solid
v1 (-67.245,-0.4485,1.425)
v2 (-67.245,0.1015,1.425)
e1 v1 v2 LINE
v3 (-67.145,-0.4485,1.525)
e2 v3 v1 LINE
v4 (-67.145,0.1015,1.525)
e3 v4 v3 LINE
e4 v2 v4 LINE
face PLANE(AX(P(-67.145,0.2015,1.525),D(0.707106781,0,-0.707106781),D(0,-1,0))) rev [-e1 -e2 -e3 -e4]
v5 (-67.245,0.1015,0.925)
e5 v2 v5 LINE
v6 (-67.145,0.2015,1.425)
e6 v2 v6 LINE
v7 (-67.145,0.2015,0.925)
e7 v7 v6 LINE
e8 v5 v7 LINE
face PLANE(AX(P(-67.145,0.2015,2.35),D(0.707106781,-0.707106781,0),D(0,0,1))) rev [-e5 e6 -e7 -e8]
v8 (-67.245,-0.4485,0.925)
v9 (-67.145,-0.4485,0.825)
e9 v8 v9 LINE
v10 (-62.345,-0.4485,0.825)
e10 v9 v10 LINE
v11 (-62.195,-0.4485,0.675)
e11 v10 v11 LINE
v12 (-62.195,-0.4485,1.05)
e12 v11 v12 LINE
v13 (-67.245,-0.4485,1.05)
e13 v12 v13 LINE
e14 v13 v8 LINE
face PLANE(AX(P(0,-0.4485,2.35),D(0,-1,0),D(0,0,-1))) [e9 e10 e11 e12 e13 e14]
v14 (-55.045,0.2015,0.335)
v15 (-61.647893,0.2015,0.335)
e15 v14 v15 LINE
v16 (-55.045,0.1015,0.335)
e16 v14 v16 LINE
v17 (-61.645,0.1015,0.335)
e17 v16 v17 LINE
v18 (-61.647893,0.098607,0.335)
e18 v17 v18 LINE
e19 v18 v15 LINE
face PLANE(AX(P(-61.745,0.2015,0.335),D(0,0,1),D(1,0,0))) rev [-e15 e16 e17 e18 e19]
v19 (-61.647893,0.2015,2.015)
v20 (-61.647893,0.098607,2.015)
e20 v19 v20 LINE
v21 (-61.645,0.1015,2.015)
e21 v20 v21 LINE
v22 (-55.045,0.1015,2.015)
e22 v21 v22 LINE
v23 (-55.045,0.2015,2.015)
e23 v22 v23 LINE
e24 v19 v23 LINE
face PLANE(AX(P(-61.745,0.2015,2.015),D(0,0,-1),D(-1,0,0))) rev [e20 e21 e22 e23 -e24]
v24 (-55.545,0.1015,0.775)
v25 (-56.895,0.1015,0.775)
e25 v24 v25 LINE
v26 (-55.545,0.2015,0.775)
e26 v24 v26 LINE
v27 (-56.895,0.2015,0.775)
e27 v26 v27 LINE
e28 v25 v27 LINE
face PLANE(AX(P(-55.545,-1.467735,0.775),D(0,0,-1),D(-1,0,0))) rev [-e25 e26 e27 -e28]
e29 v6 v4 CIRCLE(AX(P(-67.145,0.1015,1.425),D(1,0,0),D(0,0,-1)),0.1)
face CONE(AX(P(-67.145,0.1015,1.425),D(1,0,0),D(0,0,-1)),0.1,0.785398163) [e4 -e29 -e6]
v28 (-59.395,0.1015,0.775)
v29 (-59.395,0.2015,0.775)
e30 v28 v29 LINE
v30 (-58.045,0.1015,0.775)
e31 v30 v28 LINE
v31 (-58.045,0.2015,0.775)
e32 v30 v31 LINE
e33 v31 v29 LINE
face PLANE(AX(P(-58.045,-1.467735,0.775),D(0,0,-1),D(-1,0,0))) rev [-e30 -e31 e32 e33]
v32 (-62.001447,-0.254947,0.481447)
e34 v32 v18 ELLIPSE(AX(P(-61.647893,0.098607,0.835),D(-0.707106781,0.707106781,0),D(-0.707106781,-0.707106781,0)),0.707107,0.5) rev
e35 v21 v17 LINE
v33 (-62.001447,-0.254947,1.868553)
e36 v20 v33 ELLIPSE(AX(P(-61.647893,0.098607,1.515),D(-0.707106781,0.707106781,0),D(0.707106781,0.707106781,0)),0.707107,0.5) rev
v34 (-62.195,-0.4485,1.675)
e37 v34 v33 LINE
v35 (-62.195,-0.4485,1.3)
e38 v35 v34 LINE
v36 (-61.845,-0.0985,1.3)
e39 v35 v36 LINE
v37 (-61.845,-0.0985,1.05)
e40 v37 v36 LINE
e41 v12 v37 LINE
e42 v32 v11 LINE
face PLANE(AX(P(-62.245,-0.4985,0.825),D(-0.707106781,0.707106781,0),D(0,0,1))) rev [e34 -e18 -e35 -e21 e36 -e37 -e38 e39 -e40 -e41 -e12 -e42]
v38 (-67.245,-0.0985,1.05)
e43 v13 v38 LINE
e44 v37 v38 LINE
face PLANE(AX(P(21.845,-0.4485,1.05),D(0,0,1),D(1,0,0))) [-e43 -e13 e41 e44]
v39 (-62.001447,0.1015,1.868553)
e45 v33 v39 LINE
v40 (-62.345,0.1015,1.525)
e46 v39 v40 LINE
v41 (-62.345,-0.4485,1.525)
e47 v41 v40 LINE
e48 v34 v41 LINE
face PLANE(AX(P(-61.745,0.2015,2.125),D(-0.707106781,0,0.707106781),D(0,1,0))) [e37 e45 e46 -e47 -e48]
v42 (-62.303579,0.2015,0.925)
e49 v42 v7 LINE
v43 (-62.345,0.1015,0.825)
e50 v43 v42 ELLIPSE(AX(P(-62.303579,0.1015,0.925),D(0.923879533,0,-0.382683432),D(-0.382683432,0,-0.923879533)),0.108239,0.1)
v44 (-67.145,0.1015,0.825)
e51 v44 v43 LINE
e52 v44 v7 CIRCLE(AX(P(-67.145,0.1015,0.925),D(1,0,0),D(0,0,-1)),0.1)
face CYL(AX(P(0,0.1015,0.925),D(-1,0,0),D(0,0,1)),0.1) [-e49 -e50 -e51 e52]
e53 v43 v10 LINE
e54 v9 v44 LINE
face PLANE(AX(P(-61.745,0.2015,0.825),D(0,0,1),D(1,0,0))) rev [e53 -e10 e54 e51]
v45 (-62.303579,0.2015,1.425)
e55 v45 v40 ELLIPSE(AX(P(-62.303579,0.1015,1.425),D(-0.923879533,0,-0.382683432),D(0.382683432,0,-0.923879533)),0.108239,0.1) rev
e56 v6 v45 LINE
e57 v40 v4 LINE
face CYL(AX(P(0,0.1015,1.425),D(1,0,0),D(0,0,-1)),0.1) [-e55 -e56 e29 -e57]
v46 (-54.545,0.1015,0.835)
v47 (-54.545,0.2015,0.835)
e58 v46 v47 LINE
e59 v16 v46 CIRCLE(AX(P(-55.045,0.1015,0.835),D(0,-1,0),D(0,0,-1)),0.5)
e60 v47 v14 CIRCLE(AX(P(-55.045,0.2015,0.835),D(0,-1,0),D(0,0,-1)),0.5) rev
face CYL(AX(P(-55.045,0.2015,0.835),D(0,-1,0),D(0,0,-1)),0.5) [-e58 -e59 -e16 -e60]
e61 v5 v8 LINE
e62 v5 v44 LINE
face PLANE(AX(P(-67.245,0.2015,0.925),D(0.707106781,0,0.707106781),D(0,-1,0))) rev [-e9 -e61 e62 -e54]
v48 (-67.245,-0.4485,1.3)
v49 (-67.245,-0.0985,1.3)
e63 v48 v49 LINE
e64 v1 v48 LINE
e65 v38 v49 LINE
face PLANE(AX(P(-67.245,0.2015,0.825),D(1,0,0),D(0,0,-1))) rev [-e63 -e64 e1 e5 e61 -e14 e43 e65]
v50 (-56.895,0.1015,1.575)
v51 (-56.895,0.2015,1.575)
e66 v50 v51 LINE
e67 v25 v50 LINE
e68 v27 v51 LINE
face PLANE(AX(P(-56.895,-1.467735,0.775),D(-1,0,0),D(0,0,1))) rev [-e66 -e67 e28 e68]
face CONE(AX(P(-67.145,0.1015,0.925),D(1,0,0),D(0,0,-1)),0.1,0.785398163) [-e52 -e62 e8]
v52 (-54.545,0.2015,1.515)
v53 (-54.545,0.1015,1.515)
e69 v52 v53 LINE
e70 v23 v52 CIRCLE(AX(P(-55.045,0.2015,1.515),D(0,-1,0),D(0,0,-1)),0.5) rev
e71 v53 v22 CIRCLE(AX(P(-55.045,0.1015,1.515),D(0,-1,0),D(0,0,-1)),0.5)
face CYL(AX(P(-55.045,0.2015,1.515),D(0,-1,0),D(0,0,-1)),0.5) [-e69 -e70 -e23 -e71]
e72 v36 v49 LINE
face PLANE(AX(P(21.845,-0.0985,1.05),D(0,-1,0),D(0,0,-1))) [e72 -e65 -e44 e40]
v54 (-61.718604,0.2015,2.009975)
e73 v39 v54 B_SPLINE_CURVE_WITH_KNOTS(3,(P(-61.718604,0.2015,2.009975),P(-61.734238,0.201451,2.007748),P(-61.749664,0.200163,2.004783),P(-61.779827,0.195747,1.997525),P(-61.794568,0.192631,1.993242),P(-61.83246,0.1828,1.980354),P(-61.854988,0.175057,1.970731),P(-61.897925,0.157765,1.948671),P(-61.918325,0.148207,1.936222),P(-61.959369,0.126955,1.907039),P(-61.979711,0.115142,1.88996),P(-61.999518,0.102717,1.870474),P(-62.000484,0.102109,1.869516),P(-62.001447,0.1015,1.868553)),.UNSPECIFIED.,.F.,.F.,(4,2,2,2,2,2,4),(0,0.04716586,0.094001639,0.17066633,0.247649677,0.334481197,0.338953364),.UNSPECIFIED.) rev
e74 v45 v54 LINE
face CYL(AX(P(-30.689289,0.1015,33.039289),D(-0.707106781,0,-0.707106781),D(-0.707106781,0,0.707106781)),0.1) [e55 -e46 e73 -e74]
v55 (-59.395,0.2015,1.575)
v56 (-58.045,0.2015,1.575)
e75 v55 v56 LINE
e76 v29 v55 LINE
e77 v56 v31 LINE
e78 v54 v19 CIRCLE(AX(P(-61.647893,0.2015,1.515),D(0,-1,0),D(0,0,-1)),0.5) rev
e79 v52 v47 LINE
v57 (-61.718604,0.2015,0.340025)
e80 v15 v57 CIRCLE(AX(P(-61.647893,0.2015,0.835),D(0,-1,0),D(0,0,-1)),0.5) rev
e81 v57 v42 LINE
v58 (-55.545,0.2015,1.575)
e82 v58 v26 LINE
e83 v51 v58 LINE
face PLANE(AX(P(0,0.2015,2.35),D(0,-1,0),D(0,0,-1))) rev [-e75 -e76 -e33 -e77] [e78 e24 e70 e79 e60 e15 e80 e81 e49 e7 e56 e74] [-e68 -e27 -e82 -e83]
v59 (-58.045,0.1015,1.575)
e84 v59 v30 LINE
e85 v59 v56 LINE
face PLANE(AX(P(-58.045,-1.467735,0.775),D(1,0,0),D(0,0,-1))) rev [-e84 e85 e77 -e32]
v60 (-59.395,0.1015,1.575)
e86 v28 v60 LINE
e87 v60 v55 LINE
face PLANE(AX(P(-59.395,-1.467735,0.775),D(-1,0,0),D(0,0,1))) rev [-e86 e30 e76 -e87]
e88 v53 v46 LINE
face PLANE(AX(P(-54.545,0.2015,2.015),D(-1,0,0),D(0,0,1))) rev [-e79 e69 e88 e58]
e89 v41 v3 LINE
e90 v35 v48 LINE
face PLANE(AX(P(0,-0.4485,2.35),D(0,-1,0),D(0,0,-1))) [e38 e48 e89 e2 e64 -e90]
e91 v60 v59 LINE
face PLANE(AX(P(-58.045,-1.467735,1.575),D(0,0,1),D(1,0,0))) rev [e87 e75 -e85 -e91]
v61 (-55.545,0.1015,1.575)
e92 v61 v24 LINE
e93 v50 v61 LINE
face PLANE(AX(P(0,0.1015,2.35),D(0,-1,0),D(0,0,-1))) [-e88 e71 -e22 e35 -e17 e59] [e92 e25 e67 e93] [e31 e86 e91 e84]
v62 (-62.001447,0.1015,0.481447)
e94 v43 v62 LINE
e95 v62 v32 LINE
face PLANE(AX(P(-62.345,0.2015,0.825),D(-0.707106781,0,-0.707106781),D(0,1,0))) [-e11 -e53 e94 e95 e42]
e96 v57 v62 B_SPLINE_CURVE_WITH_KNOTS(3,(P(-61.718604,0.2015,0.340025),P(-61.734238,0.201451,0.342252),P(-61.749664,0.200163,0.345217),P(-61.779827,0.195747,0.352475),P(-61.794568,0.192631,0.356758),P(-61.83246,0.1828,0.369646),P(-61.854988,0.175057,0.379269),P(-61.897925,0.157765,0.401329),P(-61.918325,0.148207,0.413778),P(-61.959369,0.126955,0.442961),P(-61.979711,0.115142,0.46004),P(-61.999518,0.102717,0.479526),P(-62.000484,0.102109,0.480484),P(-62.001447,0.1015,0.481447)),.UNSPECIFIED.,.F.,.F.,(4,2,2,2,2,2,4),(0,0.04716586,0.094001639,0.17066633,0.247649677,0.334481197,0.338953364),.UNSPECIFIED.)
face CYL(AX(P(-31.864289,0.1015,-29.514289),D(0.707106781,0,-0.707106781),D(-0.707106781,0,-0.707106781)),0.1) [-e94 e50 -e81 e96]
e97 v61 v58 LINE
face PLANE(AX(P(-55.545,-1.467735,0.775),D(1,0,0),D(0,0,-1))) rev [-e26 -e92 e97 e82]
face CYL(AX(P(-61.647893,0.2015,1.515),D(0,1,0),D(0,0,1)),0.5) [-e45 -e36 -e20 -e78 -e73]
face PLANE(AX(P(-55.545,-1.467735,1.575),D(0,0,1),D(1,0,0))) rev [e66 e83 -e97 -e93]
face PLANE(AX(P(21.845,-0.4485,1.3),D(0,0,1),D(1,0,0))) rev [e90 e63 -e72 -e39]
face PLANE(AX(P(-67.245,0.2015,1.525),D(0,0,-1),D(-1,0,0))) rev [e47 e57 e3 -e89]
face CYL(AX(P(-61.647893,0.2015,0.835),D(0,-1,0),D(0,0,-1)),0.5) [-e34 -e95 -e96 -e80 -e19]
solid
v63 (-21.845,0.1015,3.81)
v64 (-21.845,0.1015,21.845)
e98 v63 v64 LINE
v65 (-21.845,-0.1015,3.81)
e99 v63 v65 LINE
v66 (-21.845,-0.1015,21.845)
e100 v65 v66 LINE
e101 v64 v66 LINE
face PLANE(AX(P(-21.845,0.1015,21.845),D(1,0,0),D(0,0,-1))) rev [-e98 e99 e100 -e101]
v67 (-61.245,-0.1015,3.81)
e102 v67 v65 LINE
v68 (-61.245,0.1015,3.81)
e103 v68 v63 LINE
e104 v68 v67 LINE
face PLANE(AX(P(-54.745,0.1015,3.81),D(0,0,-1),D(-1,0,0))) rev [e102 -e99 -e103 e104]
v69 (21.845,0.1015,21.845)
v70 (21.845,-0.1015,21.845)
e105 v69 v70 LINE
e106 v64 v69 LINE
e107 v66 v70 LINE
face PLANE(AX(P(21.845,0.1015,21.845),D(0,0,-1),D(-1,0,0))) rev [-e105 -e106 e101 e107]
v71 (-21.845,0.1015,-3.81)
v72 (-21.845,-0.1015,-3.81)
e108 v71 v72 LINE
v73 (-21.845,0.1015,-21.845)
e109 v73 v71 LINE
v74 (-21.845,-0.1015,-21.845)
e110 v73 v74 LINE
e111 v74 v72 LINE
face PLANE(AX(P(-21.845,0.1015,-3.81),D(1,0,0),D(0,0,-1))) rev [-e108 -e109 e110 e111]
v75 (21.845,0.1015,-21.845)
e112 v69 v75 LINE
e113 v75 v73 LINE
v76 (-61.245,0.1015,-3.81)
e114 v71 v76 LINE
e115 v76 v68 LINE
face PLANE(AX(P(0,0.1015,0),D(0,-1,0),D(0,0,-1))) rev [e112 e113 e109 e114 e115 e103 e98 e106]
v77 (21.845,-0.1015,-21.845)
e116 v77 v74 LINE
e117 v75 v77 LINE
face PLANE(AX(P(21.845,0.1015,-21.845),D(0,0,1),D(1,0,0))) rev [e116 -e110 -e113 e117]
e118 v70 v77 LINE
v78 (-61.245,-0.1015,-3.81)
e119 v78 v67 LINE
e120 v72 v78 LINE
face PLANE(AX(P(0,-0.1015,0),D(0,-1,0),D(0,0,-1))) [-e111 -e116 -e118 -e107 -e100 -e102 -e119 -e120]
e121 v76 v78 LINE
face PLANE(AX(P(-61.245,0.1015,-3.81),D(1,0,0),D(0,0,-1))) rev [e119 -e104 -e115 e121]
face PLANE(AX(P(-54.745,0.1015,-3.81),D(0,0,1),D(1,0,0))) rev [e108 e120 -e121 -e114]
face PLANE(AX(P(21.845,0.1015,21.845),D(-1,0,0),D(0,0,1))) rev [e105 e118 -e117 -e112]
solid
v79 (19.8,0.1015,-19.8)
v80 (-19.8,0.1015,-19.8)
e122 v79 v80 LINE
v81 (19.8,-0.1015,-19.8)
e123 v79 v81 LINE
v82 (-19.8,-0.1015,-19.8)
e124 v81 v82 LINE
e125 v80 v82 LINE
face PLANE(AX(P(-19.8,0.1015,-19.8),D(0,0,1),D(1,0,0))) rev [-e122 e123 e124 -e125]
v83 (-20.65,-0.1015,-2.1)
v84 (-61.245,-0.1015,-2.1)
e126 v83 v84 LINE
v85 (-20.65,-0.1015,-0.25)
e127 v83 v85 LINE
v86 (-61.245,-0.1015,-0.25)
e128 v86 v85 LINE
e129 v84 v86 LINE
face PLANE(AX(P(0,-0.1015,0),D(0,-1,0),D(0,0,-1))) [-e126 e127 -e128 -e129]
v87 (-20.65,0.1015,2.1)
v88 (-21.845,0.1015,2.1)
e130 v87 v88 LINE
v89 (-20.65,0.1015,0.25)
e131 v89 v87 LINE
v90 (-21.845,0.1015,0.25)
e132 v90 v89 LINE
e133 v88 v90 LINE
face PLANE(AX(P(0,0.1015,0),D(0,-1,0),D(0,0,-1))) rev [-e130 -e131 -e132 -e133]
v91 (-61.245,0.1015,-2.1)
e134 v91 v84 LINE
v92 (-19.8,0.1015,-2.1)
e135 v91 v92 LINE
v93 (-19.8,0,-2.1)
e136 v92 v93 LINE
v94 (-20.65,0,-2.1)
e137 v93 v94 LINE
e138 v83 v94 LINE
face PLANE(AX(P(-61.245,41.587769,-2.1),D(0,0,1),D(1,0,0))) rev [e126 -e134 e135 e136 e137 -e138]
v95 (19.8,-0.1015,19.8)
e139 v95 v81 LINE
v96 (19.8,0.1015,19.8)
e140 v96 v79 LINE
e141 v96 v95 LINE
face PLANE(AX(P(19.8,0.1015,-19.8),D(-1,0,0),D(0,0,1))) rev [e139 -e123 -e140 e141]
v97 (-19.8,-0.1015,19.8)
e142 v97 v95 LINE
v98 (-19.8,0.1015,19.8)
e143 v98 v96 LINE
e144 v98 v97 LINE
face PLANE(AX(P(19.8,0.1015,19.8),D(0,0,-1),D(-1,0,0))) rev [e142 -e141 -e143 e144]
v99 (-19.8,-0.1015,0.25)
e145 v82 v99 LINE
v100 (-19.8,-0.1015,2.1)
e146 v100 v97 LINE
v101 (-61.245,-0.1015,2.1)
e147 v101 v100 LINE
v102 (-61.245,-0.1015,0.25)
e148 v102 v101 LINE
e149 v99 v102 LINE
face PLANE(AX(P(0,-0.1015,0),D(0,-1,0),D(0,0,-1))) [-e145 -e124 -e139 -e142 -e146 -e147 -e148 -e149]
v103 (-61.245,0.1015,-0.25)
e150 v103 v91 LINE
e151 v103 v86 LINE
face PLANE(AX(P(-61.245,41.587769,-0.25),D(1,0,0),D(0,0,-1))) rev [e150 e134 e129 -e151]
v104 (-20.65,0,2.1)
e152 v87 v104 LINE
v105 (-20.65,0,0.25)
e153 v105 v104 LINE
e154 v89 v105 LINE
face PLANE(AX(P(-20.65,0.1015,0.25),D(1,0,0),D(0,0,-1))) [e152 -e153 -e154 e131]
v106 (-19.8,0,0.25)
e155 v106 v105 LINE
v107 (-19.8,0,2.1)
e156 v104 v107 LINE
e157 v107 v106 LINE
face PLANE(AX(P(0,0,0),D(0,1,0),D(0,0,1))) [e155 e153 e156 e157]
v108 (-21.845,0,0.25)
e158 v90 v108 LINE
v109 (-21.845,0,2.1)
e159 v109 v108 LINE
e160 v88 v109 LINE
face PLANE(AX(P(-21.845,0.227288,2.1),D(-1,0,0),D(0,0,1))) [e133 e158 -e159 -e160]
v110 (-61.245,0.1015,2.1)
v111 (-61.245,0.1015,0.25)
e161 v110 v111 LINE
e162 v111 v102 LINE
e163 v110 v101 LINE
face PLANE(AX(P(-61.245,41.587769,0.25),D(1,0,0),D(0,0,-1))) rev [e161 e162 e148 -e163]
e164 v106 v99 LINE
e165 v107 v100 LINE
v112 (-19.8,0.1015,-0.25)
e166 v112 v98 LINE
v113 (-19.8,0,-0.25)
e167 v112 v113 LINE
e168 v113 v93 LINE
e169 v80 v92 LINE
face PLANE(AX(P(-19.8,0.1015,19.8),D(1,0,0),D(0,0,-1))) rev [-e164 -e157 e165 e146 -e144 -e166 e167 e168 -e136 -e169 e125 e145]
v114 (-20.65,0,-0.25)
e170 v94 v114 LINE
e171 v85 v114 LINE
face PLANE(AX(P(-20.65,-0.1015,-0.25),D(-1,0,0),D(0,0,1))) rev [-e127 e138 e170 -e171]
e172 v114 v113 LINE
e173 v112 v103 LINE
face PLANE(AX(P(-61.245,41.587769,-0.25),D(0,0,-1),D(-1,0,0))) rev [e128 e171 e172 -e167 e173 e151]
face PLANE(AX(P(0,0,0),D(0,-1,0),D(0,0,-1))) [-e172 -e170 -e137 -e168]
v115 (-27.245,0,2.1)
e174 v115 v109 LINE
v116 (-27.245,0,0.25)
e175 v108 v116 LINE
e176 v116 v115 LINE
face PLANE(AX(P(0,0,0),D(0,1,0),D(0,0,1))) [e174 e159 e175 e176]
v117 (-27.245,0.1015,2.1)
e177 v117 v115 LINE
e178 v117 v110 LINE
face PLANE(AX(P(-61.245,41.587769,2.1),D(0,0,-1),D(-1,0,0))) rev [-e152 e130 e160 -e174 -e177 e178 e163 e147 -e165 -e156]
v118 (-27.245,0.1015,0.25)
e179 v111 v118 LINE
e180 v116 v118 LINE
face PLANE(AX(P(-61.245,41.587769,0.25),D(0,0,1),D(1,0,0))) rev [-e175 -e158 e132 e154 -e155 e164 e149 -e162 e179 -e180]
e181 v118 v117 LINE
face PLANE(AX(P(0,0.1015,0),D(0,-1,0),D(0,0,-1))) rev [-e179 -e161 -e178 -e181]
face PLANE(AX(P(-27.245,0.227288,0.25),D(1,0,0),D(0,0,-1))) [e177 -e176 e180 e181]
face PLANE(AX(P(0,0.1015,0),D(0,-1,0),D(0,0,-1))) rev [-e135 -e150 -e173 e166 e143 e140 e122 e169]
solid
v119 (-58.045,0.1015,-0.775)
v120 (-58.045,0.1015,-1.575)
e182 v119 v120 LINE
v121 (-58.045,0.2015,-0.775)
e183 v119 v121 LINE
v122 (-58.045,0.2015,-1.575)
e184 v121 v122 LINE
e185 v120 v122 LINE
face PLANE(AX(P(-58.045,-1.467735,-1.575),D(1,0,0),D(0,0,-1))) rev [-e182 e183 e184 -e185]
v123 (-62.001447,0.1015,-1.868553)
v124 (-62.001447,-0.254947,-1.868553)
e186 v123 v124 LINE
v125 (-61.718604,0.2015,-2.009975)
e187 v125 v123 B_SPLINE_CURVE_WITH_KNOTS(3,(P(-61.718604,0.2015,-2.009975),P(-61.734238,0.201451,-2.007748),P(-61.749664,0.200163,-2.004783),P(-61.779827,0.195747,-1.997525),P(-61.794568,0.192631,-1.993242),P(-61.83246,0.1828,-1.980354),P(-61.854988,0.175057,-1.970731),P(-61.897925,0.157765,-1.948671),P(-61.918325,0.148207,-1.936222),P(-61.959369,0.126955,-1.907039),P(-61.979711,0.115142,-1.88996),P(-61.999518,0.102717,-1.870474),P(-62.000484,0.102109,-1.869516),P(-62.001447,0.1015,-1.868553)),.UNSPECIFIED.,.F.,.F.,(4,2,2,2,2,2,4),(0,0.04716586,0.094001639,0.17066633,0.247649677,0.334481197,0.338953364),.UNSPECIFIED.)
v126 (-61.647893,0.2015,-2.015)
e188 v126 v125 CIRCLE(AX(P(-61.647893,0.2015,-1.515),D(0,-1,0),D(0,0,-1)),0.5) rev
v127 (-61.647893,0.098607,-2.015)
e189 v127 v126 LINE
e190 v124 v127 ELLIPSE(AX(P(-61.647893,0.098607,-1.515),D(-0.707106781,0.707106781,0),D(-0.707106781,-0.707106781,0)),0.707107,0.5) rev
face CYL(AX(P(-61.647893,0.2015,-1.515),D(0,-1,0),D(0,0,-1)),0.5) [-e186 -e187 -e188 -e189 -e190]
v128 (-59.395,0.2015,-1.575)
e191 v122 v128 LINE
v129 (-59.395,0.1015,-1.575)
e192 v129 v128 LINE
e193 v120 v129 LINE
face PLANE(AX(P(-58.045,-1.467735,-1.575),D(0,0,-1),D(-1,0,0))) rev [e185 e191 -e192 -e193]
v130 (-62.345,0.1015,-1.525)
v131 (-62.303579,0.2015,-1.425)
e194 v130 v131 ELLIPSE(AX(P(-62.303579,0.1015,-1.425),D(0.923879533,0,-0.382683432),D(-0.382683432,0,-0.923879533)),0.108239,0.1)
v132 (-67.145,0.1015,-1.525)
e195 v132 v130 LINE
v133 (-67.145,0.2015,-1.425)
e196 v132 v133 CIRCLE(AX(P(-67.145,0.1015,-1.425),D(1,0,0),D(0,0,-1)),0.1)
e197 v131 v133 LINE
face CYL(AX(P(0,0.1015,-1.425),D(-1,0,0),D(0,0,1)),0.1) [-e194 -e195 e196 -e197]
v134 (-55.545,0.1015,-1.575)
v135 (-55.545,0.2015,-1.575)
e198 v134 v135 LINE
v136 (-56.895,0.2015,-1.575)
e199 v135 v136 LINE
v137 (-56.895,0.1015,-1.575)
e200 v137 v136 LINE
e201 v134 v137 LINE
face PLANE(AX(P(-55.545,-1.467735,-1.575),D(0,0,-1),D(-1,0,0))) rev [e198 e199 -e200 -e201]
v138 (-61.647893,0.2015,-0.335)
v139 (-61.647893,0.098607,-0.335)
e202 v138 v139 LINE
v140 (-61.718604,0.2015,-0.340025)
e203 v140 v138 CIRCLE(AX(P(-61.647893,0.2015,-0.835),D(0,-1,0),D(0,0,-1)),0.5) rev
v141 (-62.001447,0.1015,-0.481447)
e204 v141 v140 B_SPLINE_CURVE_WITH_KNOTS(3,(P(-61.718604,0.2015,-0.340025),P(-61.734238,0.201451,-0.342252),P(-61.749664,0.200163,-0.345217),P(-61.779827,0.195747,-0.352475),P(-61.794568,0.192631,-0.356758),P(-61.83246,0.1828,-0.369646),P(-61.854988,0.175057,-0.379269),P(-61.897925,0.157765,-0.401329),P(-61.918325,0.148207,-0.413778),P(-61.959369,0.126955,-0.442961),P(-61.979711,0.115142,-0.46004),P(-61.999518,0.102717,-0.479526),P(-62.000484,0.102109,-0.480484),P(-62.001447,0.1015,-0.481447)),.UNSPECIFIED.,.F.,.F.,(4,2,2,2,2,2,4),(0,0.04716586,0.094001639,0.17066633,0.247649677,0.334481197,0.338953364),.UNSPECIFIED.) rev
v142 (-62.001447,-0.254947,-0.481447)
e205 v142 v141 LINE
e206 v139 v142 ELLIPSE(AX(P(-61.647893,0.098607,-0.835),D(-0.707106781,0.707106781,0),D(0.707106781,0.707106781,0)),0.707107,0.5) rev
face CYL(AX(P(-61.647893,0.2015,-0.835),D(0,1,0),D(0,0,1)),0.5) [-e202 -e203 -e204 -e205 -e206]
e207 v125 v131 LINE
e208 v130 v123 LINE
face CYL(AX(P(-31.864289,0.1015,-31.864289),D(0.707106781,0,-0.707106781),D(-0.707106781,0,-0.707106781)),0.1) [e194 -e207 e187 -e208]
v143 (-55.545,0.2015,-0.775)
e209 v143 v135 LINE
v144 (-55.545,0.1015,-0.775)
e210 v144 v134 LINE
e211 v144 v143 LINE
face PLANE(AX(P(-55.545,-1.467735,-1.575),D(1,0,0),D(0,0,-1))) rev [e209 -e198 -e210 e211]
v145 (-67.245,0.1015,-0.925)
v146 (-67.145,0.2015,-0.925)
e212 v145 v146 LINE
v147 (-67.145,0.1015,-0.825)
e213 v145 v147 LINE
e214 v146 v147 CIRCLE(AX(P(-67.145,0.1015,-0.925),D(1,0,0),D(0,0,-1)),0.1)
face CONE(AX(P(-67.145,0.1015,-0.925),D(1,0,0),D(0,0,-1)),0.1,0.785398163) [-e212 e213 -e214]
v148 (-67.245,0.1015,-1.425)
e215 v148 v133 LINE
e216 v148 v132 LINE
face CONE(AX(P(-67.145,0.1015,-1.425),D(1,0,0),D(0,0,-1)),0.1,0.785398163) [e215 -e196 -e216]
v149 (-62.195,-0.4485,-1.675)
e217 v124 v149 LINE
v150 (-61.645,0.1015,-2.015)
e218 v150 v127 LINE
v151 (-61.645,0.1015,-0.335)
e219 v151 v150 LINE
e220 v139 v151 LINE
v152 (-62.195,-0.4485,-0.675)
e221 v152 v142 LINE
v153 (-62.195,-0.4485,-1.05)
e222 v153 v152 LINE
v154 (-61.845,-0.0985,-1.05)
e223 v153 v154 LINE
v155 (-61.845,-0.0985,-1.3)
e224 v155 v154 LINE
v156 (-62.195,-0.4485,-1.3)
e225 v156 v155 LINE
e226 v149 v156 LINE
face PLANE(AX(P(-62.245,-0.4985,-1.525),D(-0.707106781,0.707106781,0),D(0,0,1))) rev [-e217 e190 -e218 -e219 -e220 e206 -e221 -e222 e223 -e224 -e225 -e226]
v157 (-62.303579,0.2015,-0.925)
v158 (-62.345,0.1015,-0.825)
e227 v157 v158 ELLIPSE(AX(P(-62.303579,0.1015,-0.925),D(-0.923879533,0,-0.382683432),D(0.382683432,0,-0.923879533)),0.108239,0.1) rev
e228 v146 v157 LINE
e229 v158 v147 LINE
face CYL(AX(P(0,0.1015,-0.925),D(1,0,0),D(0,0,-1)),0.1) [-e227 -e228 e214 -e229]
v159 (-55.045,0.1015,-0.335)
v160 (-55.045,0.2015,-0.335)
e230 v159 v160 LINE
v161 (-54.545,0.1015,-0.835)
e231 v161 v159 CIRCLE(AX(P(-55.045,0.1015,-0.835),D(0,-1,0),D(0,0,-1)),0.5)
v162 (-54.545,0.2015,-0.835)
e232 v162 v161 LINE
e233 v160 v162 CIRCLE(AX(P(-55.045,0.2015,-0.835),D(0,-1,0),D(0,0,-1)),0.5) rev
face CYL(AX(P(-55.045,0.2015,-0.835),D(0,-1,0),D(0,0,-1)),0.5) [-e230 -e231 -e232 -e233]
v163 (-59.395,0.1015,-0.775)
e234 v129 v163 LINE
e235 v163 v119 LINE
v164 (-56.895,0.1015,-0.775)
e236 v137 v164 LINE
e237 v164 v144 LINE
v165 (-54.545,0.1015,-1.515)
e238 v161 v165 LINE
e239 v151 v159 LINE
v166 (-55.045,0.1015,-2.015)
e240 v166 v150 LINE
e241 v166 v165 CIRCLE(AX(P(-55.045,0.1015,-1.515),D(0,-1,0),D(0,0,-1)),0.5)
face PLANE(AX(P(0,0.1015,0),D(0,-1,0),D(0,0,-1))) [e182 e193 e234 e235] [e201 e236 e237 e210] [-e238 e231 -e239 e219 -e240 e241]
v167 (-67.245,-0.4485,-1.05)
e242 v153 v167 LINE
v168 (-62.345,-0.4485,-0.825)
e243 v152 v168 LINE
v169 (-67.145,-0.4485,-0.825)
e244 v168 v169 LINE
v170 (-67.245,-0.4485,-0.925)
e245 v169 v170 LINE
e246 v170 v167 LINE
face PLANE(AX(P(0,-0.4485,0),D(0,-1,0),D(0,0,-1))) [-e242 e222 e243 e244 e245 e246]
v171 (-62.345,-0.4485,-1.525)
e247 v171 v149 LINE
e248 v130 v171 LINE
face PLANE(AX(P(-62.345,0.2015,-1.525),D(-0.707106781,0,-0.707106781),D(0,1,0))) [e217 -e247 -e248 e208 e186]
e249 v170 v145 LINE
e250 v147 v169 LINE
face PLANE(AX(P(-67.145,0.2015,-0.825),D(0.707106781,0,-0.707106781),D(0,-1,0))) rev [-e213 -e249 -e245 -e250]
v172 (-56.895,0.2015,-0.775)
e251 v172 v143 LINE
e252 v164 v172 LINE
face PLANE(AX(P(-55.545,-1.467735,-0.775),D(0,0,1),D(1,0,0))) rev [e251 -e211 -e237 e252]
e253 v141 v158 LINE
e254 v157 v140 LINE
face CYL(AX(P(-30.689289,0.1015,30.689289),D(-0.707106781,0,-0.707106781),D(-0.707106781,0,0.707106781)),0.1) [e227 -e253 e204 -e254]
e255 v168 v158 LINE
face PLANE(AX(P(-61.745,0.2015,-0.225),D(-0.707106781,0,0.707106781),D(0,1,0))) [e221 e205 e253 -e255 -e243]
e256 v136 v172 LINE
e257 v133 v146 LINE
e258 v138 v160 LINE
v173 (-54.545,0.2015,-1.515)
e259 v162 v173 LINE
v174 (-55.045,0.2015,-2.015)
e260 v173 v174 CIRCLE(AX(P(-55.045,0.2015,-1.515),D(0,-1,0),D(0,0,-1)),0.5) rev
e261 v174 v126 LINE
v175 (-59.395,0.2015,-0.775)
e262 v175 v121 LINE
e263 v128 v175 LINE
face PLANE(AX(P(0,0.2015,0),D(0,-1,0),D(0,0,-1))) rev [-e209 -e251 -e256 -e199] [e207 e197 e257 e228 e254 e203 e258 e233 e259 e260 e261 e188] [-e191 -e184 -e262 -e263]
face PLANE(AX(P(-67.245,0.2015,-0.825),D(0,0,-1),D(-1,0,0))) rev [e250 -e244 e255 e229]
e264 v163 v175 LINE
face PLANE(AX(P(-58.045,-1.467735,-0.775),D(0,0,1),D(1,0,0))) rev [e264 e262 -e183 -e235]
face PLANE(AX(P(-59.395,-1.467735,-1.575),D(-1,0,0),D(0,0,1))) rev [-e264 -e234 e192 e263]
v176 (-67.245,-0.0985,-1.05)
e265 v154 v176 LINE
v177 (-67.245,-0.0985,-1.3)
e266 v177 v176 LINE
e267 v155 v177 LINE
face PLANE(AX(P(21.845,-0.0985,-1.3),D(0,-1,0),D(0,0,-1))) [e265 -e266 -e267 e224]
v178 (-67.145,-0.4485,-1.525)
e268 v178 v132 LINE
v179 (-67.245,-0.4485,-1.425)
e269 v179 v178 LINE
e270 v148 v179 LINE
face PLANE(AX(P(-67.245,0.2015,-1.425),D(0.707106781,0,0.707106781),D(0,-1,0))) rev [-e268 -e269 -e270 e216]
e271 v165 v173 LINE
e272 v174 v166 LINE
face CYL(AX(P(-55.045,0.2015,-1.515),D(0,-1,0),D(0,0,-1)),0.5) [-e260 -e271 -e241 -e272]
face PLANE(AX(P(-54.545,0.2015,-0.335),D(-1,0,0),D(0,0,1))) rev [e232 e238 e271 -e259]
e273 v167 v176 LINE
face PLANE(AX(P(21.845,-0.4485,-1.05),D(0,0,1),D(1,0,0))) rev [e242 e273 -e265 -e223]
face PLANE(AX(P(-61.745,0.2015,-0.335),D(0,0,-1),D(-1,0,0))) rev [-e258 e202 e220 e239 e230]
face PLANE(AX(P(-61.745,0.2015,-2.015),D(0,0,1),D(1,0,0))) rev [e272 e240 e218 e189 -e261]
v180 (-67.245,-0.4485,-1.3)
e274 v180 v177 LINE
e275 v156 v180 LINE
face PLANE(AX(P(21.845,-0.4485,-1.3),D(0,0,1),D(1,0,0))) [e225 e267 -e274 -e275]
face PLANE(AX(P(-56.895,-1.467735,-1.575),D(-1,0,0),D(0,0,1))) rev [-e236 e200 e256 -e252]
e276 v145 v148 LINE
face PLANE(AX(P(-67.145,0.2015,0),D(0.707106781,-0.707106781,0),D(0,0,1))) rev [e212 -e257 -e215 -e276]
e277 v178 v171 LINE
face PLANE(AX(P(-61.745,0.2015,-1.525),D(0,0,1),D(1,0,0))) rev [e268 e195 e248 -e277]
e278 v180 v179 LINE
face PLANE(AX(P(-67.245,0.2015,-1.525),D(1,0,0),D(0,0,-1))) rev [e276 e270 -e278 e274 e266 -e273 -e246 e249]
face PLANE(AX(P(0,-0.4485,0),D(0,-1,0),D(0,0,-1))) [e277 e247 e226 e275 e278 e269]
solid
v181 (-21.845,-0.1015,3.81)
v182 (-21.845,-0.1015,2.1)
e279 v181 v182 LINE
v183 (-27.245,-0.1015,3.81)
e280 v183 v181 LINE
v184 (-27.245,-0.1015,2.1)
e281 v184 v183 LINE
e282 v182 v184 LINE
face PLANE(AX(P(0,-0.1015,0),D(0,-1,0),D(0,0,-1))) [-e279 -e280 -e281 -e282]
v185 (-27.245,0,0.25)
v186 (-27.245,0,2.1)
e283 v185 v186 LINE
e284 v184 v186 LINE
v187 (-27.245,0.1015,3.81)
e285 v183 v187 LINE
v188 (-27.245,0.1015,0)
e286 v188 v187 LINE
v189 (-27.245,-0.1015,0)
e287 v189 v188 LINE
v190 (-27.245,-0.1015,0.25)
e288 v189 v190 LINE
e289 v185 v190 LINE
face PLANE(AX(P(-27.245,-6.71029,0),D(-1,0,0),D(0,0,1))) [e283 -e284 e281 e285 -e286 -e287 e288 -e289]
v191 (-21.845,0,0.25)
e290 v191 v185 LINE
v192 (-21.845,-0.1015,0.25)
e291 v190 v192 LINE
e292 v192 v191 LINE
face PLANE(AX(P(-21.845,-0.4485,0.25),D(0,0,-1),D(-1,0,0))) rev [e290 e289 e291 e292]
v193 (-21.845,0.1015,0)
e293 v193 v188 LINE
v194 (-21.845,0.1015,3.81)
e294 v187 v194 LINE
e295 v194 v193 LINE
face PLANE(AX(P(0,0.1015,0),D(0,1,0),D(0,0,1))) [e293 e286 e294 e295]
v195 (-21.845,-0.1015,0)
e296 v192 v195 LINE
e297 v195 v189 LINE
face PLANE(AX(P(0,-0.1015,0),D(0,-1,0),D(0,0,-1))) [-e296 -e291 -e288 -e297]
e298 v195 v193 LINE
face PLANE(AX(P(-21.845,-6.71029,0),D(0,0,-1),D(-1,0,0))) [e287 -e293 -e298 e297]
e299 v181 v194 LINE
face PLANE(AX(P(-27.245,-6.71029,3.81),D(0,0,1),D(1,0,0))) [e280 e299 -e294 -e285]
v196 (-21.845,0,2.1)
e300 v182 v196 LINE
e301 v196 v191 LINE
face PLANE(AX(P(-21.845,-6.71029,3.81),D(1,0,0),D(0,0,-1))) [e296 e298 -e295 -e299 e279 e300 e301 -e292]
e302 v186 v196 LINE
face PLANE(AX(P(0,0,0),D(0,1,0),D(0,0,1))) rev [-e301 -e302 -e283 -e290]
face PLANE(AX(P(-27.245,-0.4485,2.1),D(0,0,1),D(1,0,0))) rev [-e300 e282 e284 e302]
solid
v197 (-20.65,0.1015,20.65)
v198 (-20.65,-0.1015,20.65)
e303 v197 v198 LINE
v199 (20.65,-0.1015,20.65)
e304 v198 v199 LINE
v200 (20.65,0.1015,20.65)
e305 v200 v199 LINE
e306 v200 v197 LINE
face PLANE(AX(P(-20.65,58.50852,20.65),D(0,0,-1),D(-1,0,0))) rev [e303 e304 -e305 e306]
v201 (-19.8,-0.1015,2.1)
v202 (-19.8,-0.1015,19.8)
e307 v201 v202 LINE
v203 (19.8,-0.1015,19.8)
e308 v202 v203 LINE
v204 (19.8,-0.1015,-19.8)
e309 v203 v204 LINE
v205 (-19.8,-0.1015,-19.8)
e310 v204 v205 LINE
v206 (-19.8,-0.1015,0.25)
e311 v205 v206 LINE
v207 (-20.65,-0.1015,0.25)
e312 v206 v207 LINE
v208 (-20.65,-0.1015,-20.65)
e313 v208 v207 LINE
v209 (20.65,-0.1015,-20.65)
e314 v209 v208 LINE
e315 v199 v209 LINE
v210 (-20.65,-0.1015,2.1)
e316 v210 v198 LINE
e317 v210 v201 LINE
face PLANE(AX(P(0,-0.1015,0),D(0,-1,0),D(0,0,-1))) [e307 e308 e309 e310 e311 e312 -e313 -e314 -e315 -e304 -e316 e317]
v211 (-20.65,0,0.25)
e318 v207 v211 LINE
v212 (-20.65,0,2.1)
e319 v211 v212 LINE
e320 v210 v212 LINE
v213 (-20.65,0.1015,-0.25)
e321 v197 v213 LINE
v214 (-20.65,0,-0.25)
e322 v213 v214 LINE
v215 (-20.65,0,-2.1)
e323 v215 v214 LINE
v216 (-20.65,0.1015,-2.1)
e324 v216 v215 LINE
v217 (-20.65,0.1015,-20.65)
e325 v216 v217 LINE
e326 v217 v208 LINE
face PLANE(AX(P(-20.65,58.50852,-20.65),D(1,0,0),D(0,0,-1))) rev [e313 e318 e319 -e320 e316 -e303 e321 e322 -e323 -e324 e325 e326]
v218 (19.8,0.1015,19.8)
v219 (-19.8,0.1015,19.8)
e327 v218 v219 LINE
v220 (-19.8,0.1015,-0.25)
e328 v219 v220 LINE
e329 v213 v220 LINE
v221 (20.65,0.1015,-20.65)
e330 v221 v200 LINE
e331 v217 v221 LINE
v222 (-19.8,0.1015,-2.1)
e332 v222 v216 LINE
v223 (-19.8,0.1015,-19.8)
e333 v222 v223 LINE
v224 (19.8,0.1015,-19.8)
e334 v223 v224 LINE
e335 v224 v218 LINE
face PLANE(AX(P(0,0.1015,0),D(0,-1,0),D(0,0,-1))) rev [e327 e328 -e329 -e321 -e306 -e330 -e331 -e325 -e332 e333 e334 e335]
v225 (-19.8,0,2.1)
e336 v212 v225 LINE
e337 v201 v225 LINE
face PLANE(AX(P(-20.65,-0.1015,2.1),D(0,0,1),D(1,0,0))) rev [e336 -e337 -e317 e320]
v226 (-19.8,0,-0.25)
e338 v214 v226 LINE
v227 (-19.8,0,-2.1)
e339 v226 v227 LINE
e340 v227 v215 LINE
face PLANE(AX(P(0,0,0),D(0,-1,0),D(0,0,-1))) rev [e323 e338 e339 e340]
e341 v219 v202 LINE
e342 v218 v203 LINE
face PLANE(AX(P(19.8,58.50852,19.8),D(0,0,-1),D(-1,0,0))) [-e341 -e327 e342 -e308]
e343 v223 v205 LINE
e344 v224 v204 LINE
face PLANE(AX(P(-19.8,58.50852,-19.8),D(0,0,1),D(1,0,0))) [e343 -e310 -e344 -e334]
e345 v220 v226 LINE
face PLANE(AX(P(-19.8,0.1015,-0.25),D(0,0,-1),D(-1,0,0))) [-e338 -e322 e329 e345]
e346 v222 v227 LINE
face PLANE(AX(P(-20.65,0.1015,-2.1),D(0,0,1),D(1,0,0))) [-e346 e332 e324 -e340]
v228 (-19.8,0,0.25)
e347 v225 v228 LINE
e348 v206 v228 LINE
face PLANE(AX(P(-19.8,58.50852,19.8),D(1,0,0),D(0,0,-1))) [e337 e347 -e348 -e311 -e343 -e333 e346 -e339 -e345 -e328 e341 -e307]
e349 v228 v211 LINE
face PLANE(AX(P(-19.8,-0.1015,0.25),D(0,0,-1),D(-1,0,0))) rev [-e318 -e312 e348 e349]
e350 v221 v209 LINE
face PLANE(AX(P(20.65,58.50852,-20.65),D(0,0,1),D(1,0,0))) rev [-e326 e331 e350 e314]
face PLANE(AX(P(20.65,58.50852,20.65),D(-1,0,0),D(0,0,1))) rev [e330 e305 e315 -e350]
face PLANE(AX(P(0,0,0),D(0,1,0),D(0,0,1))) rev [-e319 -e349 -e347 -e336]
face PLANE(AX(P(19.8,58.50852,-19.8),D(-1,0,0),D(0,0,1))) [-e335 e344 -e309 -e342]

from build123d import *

# Parameters (mm, degrees)
BOSS_EXTRUDE1_DEPTH             = 0.1015
SKETCH4_W                       = 39.6
SKETCH4_H                       = 39.6
BOSS_EXTRUDE2_DEPTH             = 0.1015
BOSS_EXTRUDE4_REACH             = 67.024
SKETCH6_W                       = 41.445
SKETCH6_H                       = 1.85
BOSS_EXTRUDE4_DIRECTION_2_REACH = 67.024
BOSS_EXTRUDE3_REACH             = 67.024
SKETCH5_W                       = 41.3
SKETCH5_H                       = 41.3
SKETCH5_W_2                     = 39.6
SKETCH5_H_2                     = 39.6
BOSS_EXTRUDE3_DIRECTION_2_REACH = 67.024
SKETCH12_W                      = 0.85
SKETCH12_H                      = 1.85
CUT_EXTRUDE2_DEPTH              = 66.024336615
SKETCH12_2_W                    = 0.85
SKETCH12_2_H                    = 1.85
CUT_EXTRUDE7_DEPTH              = 66.024336615
SKETCH14_W                      = 0.85
SKETCH14_H                      = 1.85
CUT_EXTRUDE4_DEPTH              = 66.024336615
SKETCH14_2_W                    = 0.85
SKETCH14_2_H                    = 1.85
CUT_EXTRUDE8_DEPTH              = 66.024336615
BOSS_EXTRUDE5_DEPTH             = 0.1
SKETCH29_W                      = 5
SKETCH29_H                      = 0.7
BOSS_EXTRUDE6_DEPTH             = 0.55
CHAMFER1_SIZE                   = 0.6
CHAMFER2_SIZE                   = 0.6
SKETCH30_W                      = 0.25
SKETCH30_H                      = 0.35
CUT_EXTRUDE_THIN1_DEPTH         = 92.730220087
FILLET2_R                       = 0.1
CHAMFER3_SIZE                   = 0.1
FILLET4_R                       = 0.5
FILLET5_R                       = 0.5
SKETCH31_W                      = 1.35
SKETCH31_H                      = 0.8
CUT_EXTRUDE6_DEPTH              = 0.1
LPATTERN3_COUNT                 = 2
LPATTERN3_PITCH                 = 2.35
SKETCH32_W                      = 5.4
SKETCH32_H                      = 3.81
BOSS_EXTRUDE7_DEPTH             = 0.203
SKETCH33_W                      = 5.4
SKETCH33_H                      = 1.85
CUT_EXTRUDE9_DEPTH              = 71.70569427
SKETCH33_2_W                    = 5.4
SKETCH33_2_H                    = 1.85
CUT_EXTRUDE10_DEPTH             = 71.70569427


with BuildPart() as part:
    # Sketch3 → Boss-Extrude1 (new, symmetric)
    with BuildSketch(Plane(origin=(0, 0, 0), x_dir=(1, 0, 0), z_dir=(0, 1, 0))):
        Polygon((21.845, -21.845), (21.845, 21.845), (-21.845, 21.845), (-21.845, 3.81), (-54.745, 3.81), (-61.245, 3.81), (-61.245, -3.81), (-54.745, -3.81), (-21.845, -3.81), (-21.845, -21.845), align=None)
    extrude(amount=BOSS_EXTRUDE1_DEPTH, both=True)


with BuildPart() as body_2:
    # Sketch4 → Boss-Extrude2 (new, symmetric)
    with BuildSketch(Plane(origin=(0, 0, 0), x_dir=(1, 0, 0), z_dir=(0, 1, 0))):
        Rectangle(SKETCH4_W, SKETCH4_H)
    extrude(amount=BOSS_EXTRUDE2_DEPTH, both=True)


    # Boss-Extrude4: up to this face of the body (flat: up to its plane)
    boss_extrude4_end = Plane(part.part.faces().sort_by_distance((-5.646321076, 0.1015, 0))[0])
    # Sketch6 → Boss-Extrude4 (add, up to the picked face)
    with BuildSketch(Plane(origin=(0, 0, 0), x_dir=(1, 0, 0), z_dir=(0, 1, 0)), mode=Mode.PRIVATE) as boss_extrude4_sk1:
        with Locations((-40.5225, -1.175)):
            Rectangle(SKETCH6_W, SKETCH6_H)
    boss_extrude4_tool1 = split(extrude(boss_extrude4_sk1.sketch, amount=BOSS_EXTRUDE4_REACH, mode=Mode.PRIVATE), bisect_by=boss_extrude4_end, keep=Keep.BOTH, mode=Mode.PRIVATE)
    # Sketch6 → Boss-Extrude4 (add, up to the picked face)
    with BuildSketch(Plane(origin=(0, 0, 0), x_dir=(1, 0, 0), z_dir=(0, 1, 0)), mode=Mode.PRIVATE) as boss_extrude4_sk2:
        with Locations((-40.5225, 1.175)):
            Rectangle(SKETCH6_W, SKETCH6_H)
    boss_extrude4_tool2 = split(extrude(boss_extrude4_sk2.sketch, amount=BOSS_EXTRUDE4_REACH, mode=Mode.PRIVATE), bisect_by=boss_extrude4_end, keep=Keep.BOTH, mode=Mode.PRIVATE)
    add(boss_extrude4_tool1.solids().sort_by(Axis((-40.5225, 0, 1.175), (0, 1, 0)))[0])
    add(boss_extrude4_tool2.solids().sort_by(Axis((-40.5225, 0, -1.175), (0, 1, 0)))[0])


    # Boss-Extrude4 direction 2: up to this face of the body (flat: up to its plane)
    boss_extrude4_direction_2_end = Plane(part.part.faces().sort_by_distance((-5.646321076, -0.1015, 0))[0])
    # Sketch6 → Boss-Extrude4 direction 2 (add, up to the picked face)
    with BuildSketch(Plane(origin=(0, 0, 0), x_dir=(1, 0, 0), z_dir=(0, 1, 0)), mode=Mode.PRIVATE) as boss_extrude4_direction_2_sk1:
        with Locations((-40.5225, -1.175)):
            Rectangle(SKETCH6_W, SKETCH6_H)
    boss_extrude4_direction_2_tool1 = split(extrude(boss_extrude4_direction_2_sk1.sketch, amount=-BOSS_EXTRUDE4_DIRECTION_2_REACH, mode=Mode.PRIVATE), bisect_by=boss_extrude4_direction_2_end, keep=Keep.BOTH, mode=Mode.PRIVATE)
    # Sketch6 → Boss-Extrude4 direction 2 (add, up to the picked face)
    with BuildSketch(Plane(origin=(0, 0, 0), x_dir=(1, 0, 0), z_dir=(0, 1, 0)), mode=Mode.PRIVATE) as boss_extrude4_direction_2_sk2:
        with Locations((-40.5225, 1.175)):
            Rectangle(SKETCH6_W, SKETCH6_H)
    boss_extrude4_direction_2_tool2 = split(extrude(boss_extrude4_direction_2_sk2.sketch, amount=-BOSS_EXTRUDE4_DIRECTION_2_REACH, mode=Mode.PRIVATE), bisect_by=boss_extrude4_direction_2_end, keep=Keep.BOTH, mode=Mode.PRIVATE)
    add(boss_extrude4_direction_2_tool1.solids().sort_by(Axis((-40.5225, 0, 1.175), (0, -1, 0)))[0])
    add(boss_extrude4_direction_2_tool2.solids().sort_by(Axis((-40.5225, 0, -1.175), (0, -1, 0)))[0])

    # Sketch12 → Cut-Extrude2 (cut, through all)
    with BuildSketch(Plane(origin=(0, 0, 0), x_dir=(1, 0, 0), z_dir=(0, 1, 0))):
        with Locations((-20.225, -1.175)):
            Rectangle(SKETCH12_W, SKETCH12_H)
    extrude(amount=CUT_EXTRUDE2_DEPTH, mode=Mode.SUBTRACT)

    # Sketch14<2> → Cut-Extrude8 (cut, through all)
    with BuildSketch(Plane(origin=(0, 0, 0), x_dir=(1, 0, 0), z_dir=(0, 1, 0))):
        with Locations((-20.225, 1.175)):
            Rectangle(SKETCH14_2_W, SKETCH14_2_H)
    extrude(amount=-CUT_EXTRUDE8_DEPTH, mode=Mode.SUBTRACT)

    # Sketch33<2> → Cut-Extrude10 (cut, through all)
    with BuildSketch(Plane(origin=(0, 0, 0), x_dir=(1, 0, 0), z_dir=(0, 1, 0))):
        with Locations((-24.545, -1.175)):
            Rectangle(SKETCH33_2_W, SKETCH33_2_H)
    extrude(amount=CUT_EXTRUDE10_DEPTH, mode=Mode.SUBTRACT)


with BuildPart() as body_3:

    # Boss-Extrude3: up to this face of the body (flat: up to its plane)
    boss_extrude3_end = Plane(part.part.faces().sort_by_distance((-5.646321076, 0.1015, 0))[0])
    # Sketch5 → Boss-Extrude3 (new, up to the picked face)
    with BuildSketch(Plane(origin=(0, 0, 0), x_dir=(1, 0, 0), z_dir=(0, 1, 0)), mode=Mode.PRIVATE) as boss_extrude3_sk1:
        Rectangle(SKETCH5_W, SKETCH5_H)
        Rectangle(SKETCH5_W_2, SKETCH5_H_2, mode=Mode.SUBTRACT)
    boss_extrude3_tool1 = split(extrude(boss_extrude3_sk1.sketch, amount=BOSS_EXTRUDE3_REACH, mode=Mode.PRIVATE), bisect_by=boss_extrude3_end, keep=Keep.BOTH, mode=Mode.PRIVATE)
    add(boss_extrude3_tool1.solids().sort_by(Axis((0, 0, 20.06593), (0, 1, 0)))[0])


    # Boss-Extrude3 direction 2: up to this face of the body (flat: up to its plane)
    boss_extrude3_direction_2_end = Plane(part.part.faces().sort_by_distance((-5.646321076, -0.1015, 0))[0])
    # Sketch5 → Boss-Extrude3 direction 2 (add, up to the picked face)
    with BuildSketch(Plane(origin=(0, 0, 0), x_dir=(1, 0, 0), z_dir=(0, 1, 0)), mode=Mode.PRIVATE) as boss_extrude3_direction_2_sk1:
        Rectangle(SKETCH5_W, SKETCH5_H)
        Rectangle(SKETCH5_W_2, SKETCH5_H_2, mode=Mode.SUBTRACT)
    boss_extrude3_direction_2_tool1 = split(extrude(boss_extrude3_direction_2_sk1.sketch, amount=-BOSS_EXTRUDE3_DIRECTION_2_REACH, mode=Mode.PRIVATE), bisect_by=boss_extrude3_direction_2_end, keep=Keep.BOTH, mode=Mode.PRIVATE)
    add(boss_extrude3_direction_2_tool1.solids().sort_by(Axis((0, 0, 20.06593), (0, -1, 0)))[0])

    # Sketch12<2> → Cut-Extrude7 (cut, through all)
    with BuildSketch(Plane(origin=(0, 0, 0), x_dir=(1, 0, 0), z_dir=(0, 1, 0))):
        with Locations((-20.225, -1.175)):
            Rectangle(SKETCH12_2_W, SKETCH12_2_H)
    extrude(amount=-CUT_EXTRUDE7_DEPTH, mode=Mode.SUBTRACT)

    # Sketch14 → Cut-Extrude4 (cut, through all)
    with BuildSketch(Plane(origin=(0, 0, 0), x_dir=(1, 0, 0), z_dir=(0, 1, 0))):
        with Locations((-20.225, 1.175)):
            Rectangle(SKETCH14_W, SKETCH14_H)
    extrude(amount=CUT_EXTRUDE4_DEPTH, mode=Mode.SUBTRACT)


with BuildPart() as body_4:
    # Sketch28 → Boss-Extrude5 (new body)
    with BuildSketch(Plane(origin=(0, 0.1015, 0), x_dir=(1, 0, 0), z_dir=(0, 1, 0))):
        Polygon((-61.745, 0.335), (-54.545, 0.335), (-54.545, 2.015), (-61.745, 2.015), (-61.745, 1.525), (-67.245, 1.525), (-67.245, 0.825), (-61.745, 0.825), align=None)
    extrude(amount=BOSS_EXTRUDE5_DEPTH)

    # Sketch29 → Boss-Extrude6 (add)
    with BuildSketch(Plane.XZ.offset(-0.1015)):
        with Locations((-64.745, -1.175)):
            Rectangle(SKETCH29_W, SKETCH29_H)
    extrude(amount=BOSS_EXTRUDE6_DEPTH)

    # Chamfer1
    # the kernel refuses this chamfer: 0.6 mm, written as the material it adds along each edge
    with BuildSketch(Plane(origin=(-61.745, -1.441509793, -0.825), x_dir=(-0.9996219169112968, 0, -0.027495876610586265), z_dir=(0, 1, 0))) as chamfer1_piece_1_section:
        Polygon((CHAMFER1_SIZE * 0.999621916911, CHAMFER1_SIZE * 0.0274958766106), (-CHAMFER1_SIZE * 0.0274958766106, CHAMFER1_SIZE * 0.999621916911), (0, 0), align=None)
    chamfer1_piece_1 = extrude(amount=1.643009793, mode=Mode.PRIVATE)
    chamfer1_piece_1 = split(chamfer1_piece_1, bisect_by=Plane(origin=(-62.287471069, 0.1015, -0.807931278), z_dir=(0, -1, 0)), keep=Keep.TOP, mode=Mode.PRIVATE)
    chamfer1_piece_1 = split(chamfer1_piece_1, bisect_by=Plane(origin=(-62.245, -0.1735, -0.807931278), z_dir=(-1, 0, 0)), keep=Keep.TOP, mode=Mode.PRIVATE)
    chamfer1_piece_1 = split(chamfer1_piece_1, bisect_by=Plane(origin=(-62.287471069, -0.4485, -0.807931278), z_dir=(0, 1, 0)), keep=Keep.TOP, mode=Mode.PRIVATE)
    add(chamfer1_piece_1)
    with BuildSketch(Plane(origin=(-61.745, 0.1015, -0.825), x_dir=(-0.9996219169112968, 0, -0.027495876610586265), z_dir=(0, 1, 0))) as chamfer1_piece_2_section:
        Polygon((CHAMFER1_SIZE * 0.999621916911, CHAMFER1_SIZE * 0.0274958766106), (-CHAMFER1_SIZE * 0.0274958766106, CHAMFER1_SIZE * 0.999621916911), (0, 0), align=None)
    chamfer1_piece_2 = extrude(amount=0.1, mode=Mode.PRIVATE)
    chamfer1_piece_2 = split(chamfer1_piece_2, bisect_by=Plane(origin=(-62.245, 0.1515, -0.807931278), z_dir=(-1, 0, 0)), keep=Keep.TOP, mode=Mode.PRIVATE)
    add(chamfer1_piece_2)
    with BuildSketch(Plane(origin=(-61.745, 0.1015, -0.825), x_dir=(-0.9996219169112968, 0, -0.027495876610586265), z_dir=(0, 1, 0))) as chamfer1_piece_3_section:
        Polygon((CHAMFER1_SIZE * 0.999621916911, CHAMFER1_SIZE * 0.0274958766106), (-CHAMFER1_SIZE * 0.0274958766106, CHAMFER1_SIZE * 0.999621916911), (0, 0), align=None)
    chamfer1_piece_3 = extrude(amount=0.1, mode=Mode.PRIVATE)
    chamfer1_piece_3 = split(chamfer1_piece_3, bisect_by=Plane(origin=(-61.936971503, 0.1515, -0.335), z_dir=(0, 0, -1)), keep=Keep.TOP, mode=Mode.PRIVATE)
    chamfer1_piece_3 = split(chamfer1_piece_3, bisect_by=Plane(origin=(-62.245, 0.1515, -0.636152833), z_dir=(1, 0, 0)), keep=Keep.TOP, mode=Mode.PRIVATE)
    add(chamfer1_piece_3)
    with BuildSketch(Plane(origin=(-61.745, -1.441509793, -1.525), x_dir=(-0.9996219169112968, 0, 0.027495876610586265), z_dir=(0, 1, 0))) as chamfer1_piece_4_section:
        Polygon((CHAMFER1_SIZE * 0.999621916911, -CHAMFER1_SIZE * 0.0274958766106), (-CHAMFER1_SIZE * 0.0274958766106, -CHAMFER1_SIZE * 0.999621916911), (0, 0), align=None)
    chamfer1_piece_4 = extrude(amount=1.643009793, mode=Mode.PRIVATE)
    chamfer1_piece_4 = split(chamfer1_piece_4, bisect_by=Plane(origin=(-62.287471069, -0.4485, -1.542068722), z_dir=(0, 1, 0)), keep=Keep.TOP, mode=Mode.PRIVATE)
    chamfer1_piece_4 = split(chamfer1_piece_4, bisect_by=Plane(origin=(-62.245, -0.1735, -1.542068722), z_dir=(-1, 0, 0)), keep=Keep.TOP, mode=Mode.PRIVATE)
    chamfer1_piece_4 = split(chamfer1_piece_4, bisect_by=Plane(origin=(-62.287471069, 0.1015, -1.542068722), z_dir=(0, -1, 0)), keep=Keep.TOP, mode=Mode.PRIVATE)
    add(chamfer1_piece_4)
    with BuildSketch(Plane(origin=(-61.745, 0.1015, -1.525), x_dir=(-0.9996219169112968, 0, 0.027495876610586265), z_dir=(0, 1, 0))) as chamfer1_piece_5_section:
        Polygon((CHAMFER1_SIZE * 0.999621916911, -CHAMFER1_SIZE * 0.0274958766106), (-CHAMFER1_SIZE * 0.0274958766106, -CHAMFER1_SIZE * 0.999621916911), (0, 0), align=None)
    chamfer1_piece_5 = extrude(amount=0.1, mode=Mode.PRIVATE)
    chamfer1_piece_5 = split(chamfer1_piece_5, bisect_by=Plane(origin=(-62.245, 0.1515, -1.542068722), z_dir=(-1, 0, 0)), keep=Keep.TOP, mode=Mode.PRIVATE)
    add(chamfer1_piece_5)
    with BuildSketch(Plane(origin=(-61.745, 0.1015, -1.525), x_dir=(-0.9996219169112968, 0, 0.027495876610586265), z_dir=(0, 1, 0))) as chamfer1_piece_6_section:
        Polygon((CHAMFER1_SIZE * 0.999621916911, -CHAMFER1_SIZE * 0.0274958766106), (-CHAMFER1_SIZE * 0.0274958766106, -CHAMFER1_SIZE * 0.999621916911), (0, 0), align=None)
    chamfer1_piece_6 = extrude(amount=0.1, mode=Mode.PRIVATE)
    chamfer1_piece_6 = split(chamfer1_piece_6, bisect_by=Plane(origin=(-62.245, 0.1515, -1.713847167), z_dir=(1, 0, 0)), keep=Keep.TOP, mode=Mode.PRIVATE)
    chamfer1_piece_6 = split(chamfer1_piece_6, bisect_by=Plane(origin=(-61.936971503, 0.1515, -2.015), z_dir=(0, 0, 1)), keep=Keep.TOP, mode=Mode.PRIVATE)
    add(chamfer1_piece_6)

    # Chamfer2
    # the kernel refuses this chamfer: 0.6 mm, written as the material it adds along each edge
    with BuildSketch(Plane(origin=(-62.245, 0.1015, 0.818009793), x_dir=(-0.027495876610584478, -0.9996219169112968, 0), z_dir=(0, 0, -1))) as chamfer2_piece_1_section:
        Polygon((CHAMFER2_SIZE * 0.999621916911, -CHAMFER2_SIZE * 0.0274958766106), (-CHAMFER2_SIZE * 0.0274958766106, -CHAMFER2_SIZE * 0.999621916911), (0, 0), align=None)
    chamfer2_piece_1 = extrude(amount=3.986019586, mode=Mode.PRIVATE)
    chamfer2_piece_1 = split(chamfer2_piece_1, bisect_by=Plane(origin=(-62.354551126, -0.075864329, -1.515448874), z_dir=(0.7071067811868302, 0, 0.7071067811862649)), keep=Keep.TOP, mode=Mode.PRIVATE)
    chamfer2_piece_1 = split(chamfer2_piece_1, bisect_by=Plane(origin=(-62.014102253, -0.075864329, -2.015), z_dir=(0, 0, 1)), keep=Keep.TOP, mode=Mode.PRIVATE)
    chamfer2_piece_1 = split(chamfer2_piece_1, bisect_by=Plane(origin=(-62.014102253, -0.075864329, -0.335), z_dir=(0, 0, -1)), keep=Keep.TOP, mode=Mode.PRIVATE)
    chamfer2_piece_1 = split(chamfer2_piece_1, bisect_by=Plane(origin=(-62.354551126, -0.075864329, -0.834551126), z_dir=(0.7071067811868302, 0, -0.7071067811862649)), keep=Keep.TOP, mode=Mode.PRIVATE)
    chamfer2_piece_1 = split(chamfer2_piece_1, bisect_by=Plane(origin=(-62.014102253, -0.4485, -1.175), z_dir=(0, 1, 0)), keep=Keep.TOP, mode=Mode.PRIVATE)
    add(chamfer2_piece_1)

    # Sketch30 → Cut-Extrude-Thin1 (cut, through all)
    with BuildSketch(Plane.ZY.offset(67.245)):
        with Locations((-1.175, -0.2735)):
            Rectangle(SKETCH30_W, SKETCH30_H)
    extrude(amount=-CUT_EXTRUDE_THIN1_DEPTH, mode=Mode.SUBTRACT)

    # Fillet2
    fillet2_edges = [body_4.edges().sort_by_distance(p)[0] for p in [
        (-62.1, 0.2015, -1.77),
        (-62.1, 0.2015, -0.58),
        (-64.795, 0.2015, -0.825),
        (-64.795, 0.2015, -1.525),
    ]]
    fillet(fillet2_edges, radius=FILLET2_R)

    # Chamfer3
    chamfer3_edges = [body_4.edges().sort_by_distance(p)[0] for p in [
        (-67.245, 0.2015, -1.175),
        (-67.245, -0.1735, -0.825),
        (-67.245, -0.1735, -1.525),
        (-67.245, 0.172210678, -1.495710678),
        (-67.245, 0.172210678, -0.854289322),
    ]]
    chamfer(chamfer3_edges, length=CHAMFER3_SIZE)

    # Fillet4
    # the kernel refuses this fillet: 0.5 mm, written as the material it takes off along each edge
    with BuildSketch(Plane(origin=(-61.855, 0.619266953, -2.015), x_dir=(1, 0, 0), z_dir=(0, -1, 0))) as fillet4_piece_1:
        with BuildLine():
            CenterArc((FILLET4_R * 0.414213562374, FILLET4_R), FILLET4_R, 225, 45)
            Line((-FILLET4_R * 0.292893218814, FILLET4_R * 0.292893218814), (0, 0))
            Line((0, 0), (FILLET4_R * 0.414213562374, 0))
        make_face()
    extrude(amount=1.245533906, mode=Mode.SUBTRACT)
    with BuildSketch(Plane(origin=(-61.855, 0.619266953, -0.335), x_dir=(1, 0, 0), z_dir=(0, -1, 0))) as fillet4_piece_2:
        with BuildLine():
            CenterArc((FILLET4_R * 0.414213562374, -FILLET4_R), FILLET4_R, 90, 45)
            Line((-FILLET4_R * 0.292893218814, -FILLET4_R * 0.292893218814), (0, 0))
            Line((0, 0), (FILLET4_R * 0.414213562374, 0))
        make_face()
    extrude(amount=1.245533906, mode=Mode.SUBTRACT)

    # Fillet5
    fillet5_edges = [body_4.edges().sort_by_distance(p)[0] for p in [
        (-54.545, 0.1515, -0.335),
        (-54.545, 0.1515, -2.015),
    ]]
    fillet(fillet5_edges, radius=FILLET5_R)

    # Sketch31 → Cut-Extrude6 (cut)
    with BuildSketch(Plane(origin=(0, 0.2015, 0), x_dir=(1, 0, 0), z_dir=(0, 1, 0))):
        with Locations((-56.22, 1.175)):
            Rectangle(SKETCH31_W, SKETCH31_H)
        with Locations((-58.72, 1.175)):
            Rectangle(SKETCH31_W, SKETCH31_H)
    extrude(amount=-CUT_EXTRUDE6_DEPTH, mode=Mode.SUBTRACT)


with BuildPart() as lpattern3_1:
    # LPattern3: pattern copy
    add(body_4.part.moved(Location(Vector(0, 0, 1) * (1 * LPATTERN3_PITCH))))


with BuildPart() as body_6:
    # Sketch32 → Boss-Extrude7 (new body)
    with BuildSketch(Plane(origin=(0, 0.1015, 0), x_dir=(1, 0, 0), z_dir=(0, 1, 0))):
        with Locations((-24.545, -1.905)):
            Rectangle(SKETCH32_W, SKETCH32_H)
    extrude(amount=-BOSS_EXTRUDE7_DEPTH)

    # Sketch33 → Cut-Extrude9 (cut, through all)
    with BuildSketch(Plane(origin=(0, 0, 0), x_dir=(1, 0, 0), z_dir=(0, 1, 0))):
        with Locations((-24.545, -1.175)):
            Rectangle(SKETCH33_W, SKETCH33_H)
    extrude(amount=-CUT_EXTRUDE9_DEPTH, mode=Mode.SUBTRACT)


solid = Compound([part.part, body_2.part, body_3.part, body_4.part, lpattern3_1.part, body_6.part])
